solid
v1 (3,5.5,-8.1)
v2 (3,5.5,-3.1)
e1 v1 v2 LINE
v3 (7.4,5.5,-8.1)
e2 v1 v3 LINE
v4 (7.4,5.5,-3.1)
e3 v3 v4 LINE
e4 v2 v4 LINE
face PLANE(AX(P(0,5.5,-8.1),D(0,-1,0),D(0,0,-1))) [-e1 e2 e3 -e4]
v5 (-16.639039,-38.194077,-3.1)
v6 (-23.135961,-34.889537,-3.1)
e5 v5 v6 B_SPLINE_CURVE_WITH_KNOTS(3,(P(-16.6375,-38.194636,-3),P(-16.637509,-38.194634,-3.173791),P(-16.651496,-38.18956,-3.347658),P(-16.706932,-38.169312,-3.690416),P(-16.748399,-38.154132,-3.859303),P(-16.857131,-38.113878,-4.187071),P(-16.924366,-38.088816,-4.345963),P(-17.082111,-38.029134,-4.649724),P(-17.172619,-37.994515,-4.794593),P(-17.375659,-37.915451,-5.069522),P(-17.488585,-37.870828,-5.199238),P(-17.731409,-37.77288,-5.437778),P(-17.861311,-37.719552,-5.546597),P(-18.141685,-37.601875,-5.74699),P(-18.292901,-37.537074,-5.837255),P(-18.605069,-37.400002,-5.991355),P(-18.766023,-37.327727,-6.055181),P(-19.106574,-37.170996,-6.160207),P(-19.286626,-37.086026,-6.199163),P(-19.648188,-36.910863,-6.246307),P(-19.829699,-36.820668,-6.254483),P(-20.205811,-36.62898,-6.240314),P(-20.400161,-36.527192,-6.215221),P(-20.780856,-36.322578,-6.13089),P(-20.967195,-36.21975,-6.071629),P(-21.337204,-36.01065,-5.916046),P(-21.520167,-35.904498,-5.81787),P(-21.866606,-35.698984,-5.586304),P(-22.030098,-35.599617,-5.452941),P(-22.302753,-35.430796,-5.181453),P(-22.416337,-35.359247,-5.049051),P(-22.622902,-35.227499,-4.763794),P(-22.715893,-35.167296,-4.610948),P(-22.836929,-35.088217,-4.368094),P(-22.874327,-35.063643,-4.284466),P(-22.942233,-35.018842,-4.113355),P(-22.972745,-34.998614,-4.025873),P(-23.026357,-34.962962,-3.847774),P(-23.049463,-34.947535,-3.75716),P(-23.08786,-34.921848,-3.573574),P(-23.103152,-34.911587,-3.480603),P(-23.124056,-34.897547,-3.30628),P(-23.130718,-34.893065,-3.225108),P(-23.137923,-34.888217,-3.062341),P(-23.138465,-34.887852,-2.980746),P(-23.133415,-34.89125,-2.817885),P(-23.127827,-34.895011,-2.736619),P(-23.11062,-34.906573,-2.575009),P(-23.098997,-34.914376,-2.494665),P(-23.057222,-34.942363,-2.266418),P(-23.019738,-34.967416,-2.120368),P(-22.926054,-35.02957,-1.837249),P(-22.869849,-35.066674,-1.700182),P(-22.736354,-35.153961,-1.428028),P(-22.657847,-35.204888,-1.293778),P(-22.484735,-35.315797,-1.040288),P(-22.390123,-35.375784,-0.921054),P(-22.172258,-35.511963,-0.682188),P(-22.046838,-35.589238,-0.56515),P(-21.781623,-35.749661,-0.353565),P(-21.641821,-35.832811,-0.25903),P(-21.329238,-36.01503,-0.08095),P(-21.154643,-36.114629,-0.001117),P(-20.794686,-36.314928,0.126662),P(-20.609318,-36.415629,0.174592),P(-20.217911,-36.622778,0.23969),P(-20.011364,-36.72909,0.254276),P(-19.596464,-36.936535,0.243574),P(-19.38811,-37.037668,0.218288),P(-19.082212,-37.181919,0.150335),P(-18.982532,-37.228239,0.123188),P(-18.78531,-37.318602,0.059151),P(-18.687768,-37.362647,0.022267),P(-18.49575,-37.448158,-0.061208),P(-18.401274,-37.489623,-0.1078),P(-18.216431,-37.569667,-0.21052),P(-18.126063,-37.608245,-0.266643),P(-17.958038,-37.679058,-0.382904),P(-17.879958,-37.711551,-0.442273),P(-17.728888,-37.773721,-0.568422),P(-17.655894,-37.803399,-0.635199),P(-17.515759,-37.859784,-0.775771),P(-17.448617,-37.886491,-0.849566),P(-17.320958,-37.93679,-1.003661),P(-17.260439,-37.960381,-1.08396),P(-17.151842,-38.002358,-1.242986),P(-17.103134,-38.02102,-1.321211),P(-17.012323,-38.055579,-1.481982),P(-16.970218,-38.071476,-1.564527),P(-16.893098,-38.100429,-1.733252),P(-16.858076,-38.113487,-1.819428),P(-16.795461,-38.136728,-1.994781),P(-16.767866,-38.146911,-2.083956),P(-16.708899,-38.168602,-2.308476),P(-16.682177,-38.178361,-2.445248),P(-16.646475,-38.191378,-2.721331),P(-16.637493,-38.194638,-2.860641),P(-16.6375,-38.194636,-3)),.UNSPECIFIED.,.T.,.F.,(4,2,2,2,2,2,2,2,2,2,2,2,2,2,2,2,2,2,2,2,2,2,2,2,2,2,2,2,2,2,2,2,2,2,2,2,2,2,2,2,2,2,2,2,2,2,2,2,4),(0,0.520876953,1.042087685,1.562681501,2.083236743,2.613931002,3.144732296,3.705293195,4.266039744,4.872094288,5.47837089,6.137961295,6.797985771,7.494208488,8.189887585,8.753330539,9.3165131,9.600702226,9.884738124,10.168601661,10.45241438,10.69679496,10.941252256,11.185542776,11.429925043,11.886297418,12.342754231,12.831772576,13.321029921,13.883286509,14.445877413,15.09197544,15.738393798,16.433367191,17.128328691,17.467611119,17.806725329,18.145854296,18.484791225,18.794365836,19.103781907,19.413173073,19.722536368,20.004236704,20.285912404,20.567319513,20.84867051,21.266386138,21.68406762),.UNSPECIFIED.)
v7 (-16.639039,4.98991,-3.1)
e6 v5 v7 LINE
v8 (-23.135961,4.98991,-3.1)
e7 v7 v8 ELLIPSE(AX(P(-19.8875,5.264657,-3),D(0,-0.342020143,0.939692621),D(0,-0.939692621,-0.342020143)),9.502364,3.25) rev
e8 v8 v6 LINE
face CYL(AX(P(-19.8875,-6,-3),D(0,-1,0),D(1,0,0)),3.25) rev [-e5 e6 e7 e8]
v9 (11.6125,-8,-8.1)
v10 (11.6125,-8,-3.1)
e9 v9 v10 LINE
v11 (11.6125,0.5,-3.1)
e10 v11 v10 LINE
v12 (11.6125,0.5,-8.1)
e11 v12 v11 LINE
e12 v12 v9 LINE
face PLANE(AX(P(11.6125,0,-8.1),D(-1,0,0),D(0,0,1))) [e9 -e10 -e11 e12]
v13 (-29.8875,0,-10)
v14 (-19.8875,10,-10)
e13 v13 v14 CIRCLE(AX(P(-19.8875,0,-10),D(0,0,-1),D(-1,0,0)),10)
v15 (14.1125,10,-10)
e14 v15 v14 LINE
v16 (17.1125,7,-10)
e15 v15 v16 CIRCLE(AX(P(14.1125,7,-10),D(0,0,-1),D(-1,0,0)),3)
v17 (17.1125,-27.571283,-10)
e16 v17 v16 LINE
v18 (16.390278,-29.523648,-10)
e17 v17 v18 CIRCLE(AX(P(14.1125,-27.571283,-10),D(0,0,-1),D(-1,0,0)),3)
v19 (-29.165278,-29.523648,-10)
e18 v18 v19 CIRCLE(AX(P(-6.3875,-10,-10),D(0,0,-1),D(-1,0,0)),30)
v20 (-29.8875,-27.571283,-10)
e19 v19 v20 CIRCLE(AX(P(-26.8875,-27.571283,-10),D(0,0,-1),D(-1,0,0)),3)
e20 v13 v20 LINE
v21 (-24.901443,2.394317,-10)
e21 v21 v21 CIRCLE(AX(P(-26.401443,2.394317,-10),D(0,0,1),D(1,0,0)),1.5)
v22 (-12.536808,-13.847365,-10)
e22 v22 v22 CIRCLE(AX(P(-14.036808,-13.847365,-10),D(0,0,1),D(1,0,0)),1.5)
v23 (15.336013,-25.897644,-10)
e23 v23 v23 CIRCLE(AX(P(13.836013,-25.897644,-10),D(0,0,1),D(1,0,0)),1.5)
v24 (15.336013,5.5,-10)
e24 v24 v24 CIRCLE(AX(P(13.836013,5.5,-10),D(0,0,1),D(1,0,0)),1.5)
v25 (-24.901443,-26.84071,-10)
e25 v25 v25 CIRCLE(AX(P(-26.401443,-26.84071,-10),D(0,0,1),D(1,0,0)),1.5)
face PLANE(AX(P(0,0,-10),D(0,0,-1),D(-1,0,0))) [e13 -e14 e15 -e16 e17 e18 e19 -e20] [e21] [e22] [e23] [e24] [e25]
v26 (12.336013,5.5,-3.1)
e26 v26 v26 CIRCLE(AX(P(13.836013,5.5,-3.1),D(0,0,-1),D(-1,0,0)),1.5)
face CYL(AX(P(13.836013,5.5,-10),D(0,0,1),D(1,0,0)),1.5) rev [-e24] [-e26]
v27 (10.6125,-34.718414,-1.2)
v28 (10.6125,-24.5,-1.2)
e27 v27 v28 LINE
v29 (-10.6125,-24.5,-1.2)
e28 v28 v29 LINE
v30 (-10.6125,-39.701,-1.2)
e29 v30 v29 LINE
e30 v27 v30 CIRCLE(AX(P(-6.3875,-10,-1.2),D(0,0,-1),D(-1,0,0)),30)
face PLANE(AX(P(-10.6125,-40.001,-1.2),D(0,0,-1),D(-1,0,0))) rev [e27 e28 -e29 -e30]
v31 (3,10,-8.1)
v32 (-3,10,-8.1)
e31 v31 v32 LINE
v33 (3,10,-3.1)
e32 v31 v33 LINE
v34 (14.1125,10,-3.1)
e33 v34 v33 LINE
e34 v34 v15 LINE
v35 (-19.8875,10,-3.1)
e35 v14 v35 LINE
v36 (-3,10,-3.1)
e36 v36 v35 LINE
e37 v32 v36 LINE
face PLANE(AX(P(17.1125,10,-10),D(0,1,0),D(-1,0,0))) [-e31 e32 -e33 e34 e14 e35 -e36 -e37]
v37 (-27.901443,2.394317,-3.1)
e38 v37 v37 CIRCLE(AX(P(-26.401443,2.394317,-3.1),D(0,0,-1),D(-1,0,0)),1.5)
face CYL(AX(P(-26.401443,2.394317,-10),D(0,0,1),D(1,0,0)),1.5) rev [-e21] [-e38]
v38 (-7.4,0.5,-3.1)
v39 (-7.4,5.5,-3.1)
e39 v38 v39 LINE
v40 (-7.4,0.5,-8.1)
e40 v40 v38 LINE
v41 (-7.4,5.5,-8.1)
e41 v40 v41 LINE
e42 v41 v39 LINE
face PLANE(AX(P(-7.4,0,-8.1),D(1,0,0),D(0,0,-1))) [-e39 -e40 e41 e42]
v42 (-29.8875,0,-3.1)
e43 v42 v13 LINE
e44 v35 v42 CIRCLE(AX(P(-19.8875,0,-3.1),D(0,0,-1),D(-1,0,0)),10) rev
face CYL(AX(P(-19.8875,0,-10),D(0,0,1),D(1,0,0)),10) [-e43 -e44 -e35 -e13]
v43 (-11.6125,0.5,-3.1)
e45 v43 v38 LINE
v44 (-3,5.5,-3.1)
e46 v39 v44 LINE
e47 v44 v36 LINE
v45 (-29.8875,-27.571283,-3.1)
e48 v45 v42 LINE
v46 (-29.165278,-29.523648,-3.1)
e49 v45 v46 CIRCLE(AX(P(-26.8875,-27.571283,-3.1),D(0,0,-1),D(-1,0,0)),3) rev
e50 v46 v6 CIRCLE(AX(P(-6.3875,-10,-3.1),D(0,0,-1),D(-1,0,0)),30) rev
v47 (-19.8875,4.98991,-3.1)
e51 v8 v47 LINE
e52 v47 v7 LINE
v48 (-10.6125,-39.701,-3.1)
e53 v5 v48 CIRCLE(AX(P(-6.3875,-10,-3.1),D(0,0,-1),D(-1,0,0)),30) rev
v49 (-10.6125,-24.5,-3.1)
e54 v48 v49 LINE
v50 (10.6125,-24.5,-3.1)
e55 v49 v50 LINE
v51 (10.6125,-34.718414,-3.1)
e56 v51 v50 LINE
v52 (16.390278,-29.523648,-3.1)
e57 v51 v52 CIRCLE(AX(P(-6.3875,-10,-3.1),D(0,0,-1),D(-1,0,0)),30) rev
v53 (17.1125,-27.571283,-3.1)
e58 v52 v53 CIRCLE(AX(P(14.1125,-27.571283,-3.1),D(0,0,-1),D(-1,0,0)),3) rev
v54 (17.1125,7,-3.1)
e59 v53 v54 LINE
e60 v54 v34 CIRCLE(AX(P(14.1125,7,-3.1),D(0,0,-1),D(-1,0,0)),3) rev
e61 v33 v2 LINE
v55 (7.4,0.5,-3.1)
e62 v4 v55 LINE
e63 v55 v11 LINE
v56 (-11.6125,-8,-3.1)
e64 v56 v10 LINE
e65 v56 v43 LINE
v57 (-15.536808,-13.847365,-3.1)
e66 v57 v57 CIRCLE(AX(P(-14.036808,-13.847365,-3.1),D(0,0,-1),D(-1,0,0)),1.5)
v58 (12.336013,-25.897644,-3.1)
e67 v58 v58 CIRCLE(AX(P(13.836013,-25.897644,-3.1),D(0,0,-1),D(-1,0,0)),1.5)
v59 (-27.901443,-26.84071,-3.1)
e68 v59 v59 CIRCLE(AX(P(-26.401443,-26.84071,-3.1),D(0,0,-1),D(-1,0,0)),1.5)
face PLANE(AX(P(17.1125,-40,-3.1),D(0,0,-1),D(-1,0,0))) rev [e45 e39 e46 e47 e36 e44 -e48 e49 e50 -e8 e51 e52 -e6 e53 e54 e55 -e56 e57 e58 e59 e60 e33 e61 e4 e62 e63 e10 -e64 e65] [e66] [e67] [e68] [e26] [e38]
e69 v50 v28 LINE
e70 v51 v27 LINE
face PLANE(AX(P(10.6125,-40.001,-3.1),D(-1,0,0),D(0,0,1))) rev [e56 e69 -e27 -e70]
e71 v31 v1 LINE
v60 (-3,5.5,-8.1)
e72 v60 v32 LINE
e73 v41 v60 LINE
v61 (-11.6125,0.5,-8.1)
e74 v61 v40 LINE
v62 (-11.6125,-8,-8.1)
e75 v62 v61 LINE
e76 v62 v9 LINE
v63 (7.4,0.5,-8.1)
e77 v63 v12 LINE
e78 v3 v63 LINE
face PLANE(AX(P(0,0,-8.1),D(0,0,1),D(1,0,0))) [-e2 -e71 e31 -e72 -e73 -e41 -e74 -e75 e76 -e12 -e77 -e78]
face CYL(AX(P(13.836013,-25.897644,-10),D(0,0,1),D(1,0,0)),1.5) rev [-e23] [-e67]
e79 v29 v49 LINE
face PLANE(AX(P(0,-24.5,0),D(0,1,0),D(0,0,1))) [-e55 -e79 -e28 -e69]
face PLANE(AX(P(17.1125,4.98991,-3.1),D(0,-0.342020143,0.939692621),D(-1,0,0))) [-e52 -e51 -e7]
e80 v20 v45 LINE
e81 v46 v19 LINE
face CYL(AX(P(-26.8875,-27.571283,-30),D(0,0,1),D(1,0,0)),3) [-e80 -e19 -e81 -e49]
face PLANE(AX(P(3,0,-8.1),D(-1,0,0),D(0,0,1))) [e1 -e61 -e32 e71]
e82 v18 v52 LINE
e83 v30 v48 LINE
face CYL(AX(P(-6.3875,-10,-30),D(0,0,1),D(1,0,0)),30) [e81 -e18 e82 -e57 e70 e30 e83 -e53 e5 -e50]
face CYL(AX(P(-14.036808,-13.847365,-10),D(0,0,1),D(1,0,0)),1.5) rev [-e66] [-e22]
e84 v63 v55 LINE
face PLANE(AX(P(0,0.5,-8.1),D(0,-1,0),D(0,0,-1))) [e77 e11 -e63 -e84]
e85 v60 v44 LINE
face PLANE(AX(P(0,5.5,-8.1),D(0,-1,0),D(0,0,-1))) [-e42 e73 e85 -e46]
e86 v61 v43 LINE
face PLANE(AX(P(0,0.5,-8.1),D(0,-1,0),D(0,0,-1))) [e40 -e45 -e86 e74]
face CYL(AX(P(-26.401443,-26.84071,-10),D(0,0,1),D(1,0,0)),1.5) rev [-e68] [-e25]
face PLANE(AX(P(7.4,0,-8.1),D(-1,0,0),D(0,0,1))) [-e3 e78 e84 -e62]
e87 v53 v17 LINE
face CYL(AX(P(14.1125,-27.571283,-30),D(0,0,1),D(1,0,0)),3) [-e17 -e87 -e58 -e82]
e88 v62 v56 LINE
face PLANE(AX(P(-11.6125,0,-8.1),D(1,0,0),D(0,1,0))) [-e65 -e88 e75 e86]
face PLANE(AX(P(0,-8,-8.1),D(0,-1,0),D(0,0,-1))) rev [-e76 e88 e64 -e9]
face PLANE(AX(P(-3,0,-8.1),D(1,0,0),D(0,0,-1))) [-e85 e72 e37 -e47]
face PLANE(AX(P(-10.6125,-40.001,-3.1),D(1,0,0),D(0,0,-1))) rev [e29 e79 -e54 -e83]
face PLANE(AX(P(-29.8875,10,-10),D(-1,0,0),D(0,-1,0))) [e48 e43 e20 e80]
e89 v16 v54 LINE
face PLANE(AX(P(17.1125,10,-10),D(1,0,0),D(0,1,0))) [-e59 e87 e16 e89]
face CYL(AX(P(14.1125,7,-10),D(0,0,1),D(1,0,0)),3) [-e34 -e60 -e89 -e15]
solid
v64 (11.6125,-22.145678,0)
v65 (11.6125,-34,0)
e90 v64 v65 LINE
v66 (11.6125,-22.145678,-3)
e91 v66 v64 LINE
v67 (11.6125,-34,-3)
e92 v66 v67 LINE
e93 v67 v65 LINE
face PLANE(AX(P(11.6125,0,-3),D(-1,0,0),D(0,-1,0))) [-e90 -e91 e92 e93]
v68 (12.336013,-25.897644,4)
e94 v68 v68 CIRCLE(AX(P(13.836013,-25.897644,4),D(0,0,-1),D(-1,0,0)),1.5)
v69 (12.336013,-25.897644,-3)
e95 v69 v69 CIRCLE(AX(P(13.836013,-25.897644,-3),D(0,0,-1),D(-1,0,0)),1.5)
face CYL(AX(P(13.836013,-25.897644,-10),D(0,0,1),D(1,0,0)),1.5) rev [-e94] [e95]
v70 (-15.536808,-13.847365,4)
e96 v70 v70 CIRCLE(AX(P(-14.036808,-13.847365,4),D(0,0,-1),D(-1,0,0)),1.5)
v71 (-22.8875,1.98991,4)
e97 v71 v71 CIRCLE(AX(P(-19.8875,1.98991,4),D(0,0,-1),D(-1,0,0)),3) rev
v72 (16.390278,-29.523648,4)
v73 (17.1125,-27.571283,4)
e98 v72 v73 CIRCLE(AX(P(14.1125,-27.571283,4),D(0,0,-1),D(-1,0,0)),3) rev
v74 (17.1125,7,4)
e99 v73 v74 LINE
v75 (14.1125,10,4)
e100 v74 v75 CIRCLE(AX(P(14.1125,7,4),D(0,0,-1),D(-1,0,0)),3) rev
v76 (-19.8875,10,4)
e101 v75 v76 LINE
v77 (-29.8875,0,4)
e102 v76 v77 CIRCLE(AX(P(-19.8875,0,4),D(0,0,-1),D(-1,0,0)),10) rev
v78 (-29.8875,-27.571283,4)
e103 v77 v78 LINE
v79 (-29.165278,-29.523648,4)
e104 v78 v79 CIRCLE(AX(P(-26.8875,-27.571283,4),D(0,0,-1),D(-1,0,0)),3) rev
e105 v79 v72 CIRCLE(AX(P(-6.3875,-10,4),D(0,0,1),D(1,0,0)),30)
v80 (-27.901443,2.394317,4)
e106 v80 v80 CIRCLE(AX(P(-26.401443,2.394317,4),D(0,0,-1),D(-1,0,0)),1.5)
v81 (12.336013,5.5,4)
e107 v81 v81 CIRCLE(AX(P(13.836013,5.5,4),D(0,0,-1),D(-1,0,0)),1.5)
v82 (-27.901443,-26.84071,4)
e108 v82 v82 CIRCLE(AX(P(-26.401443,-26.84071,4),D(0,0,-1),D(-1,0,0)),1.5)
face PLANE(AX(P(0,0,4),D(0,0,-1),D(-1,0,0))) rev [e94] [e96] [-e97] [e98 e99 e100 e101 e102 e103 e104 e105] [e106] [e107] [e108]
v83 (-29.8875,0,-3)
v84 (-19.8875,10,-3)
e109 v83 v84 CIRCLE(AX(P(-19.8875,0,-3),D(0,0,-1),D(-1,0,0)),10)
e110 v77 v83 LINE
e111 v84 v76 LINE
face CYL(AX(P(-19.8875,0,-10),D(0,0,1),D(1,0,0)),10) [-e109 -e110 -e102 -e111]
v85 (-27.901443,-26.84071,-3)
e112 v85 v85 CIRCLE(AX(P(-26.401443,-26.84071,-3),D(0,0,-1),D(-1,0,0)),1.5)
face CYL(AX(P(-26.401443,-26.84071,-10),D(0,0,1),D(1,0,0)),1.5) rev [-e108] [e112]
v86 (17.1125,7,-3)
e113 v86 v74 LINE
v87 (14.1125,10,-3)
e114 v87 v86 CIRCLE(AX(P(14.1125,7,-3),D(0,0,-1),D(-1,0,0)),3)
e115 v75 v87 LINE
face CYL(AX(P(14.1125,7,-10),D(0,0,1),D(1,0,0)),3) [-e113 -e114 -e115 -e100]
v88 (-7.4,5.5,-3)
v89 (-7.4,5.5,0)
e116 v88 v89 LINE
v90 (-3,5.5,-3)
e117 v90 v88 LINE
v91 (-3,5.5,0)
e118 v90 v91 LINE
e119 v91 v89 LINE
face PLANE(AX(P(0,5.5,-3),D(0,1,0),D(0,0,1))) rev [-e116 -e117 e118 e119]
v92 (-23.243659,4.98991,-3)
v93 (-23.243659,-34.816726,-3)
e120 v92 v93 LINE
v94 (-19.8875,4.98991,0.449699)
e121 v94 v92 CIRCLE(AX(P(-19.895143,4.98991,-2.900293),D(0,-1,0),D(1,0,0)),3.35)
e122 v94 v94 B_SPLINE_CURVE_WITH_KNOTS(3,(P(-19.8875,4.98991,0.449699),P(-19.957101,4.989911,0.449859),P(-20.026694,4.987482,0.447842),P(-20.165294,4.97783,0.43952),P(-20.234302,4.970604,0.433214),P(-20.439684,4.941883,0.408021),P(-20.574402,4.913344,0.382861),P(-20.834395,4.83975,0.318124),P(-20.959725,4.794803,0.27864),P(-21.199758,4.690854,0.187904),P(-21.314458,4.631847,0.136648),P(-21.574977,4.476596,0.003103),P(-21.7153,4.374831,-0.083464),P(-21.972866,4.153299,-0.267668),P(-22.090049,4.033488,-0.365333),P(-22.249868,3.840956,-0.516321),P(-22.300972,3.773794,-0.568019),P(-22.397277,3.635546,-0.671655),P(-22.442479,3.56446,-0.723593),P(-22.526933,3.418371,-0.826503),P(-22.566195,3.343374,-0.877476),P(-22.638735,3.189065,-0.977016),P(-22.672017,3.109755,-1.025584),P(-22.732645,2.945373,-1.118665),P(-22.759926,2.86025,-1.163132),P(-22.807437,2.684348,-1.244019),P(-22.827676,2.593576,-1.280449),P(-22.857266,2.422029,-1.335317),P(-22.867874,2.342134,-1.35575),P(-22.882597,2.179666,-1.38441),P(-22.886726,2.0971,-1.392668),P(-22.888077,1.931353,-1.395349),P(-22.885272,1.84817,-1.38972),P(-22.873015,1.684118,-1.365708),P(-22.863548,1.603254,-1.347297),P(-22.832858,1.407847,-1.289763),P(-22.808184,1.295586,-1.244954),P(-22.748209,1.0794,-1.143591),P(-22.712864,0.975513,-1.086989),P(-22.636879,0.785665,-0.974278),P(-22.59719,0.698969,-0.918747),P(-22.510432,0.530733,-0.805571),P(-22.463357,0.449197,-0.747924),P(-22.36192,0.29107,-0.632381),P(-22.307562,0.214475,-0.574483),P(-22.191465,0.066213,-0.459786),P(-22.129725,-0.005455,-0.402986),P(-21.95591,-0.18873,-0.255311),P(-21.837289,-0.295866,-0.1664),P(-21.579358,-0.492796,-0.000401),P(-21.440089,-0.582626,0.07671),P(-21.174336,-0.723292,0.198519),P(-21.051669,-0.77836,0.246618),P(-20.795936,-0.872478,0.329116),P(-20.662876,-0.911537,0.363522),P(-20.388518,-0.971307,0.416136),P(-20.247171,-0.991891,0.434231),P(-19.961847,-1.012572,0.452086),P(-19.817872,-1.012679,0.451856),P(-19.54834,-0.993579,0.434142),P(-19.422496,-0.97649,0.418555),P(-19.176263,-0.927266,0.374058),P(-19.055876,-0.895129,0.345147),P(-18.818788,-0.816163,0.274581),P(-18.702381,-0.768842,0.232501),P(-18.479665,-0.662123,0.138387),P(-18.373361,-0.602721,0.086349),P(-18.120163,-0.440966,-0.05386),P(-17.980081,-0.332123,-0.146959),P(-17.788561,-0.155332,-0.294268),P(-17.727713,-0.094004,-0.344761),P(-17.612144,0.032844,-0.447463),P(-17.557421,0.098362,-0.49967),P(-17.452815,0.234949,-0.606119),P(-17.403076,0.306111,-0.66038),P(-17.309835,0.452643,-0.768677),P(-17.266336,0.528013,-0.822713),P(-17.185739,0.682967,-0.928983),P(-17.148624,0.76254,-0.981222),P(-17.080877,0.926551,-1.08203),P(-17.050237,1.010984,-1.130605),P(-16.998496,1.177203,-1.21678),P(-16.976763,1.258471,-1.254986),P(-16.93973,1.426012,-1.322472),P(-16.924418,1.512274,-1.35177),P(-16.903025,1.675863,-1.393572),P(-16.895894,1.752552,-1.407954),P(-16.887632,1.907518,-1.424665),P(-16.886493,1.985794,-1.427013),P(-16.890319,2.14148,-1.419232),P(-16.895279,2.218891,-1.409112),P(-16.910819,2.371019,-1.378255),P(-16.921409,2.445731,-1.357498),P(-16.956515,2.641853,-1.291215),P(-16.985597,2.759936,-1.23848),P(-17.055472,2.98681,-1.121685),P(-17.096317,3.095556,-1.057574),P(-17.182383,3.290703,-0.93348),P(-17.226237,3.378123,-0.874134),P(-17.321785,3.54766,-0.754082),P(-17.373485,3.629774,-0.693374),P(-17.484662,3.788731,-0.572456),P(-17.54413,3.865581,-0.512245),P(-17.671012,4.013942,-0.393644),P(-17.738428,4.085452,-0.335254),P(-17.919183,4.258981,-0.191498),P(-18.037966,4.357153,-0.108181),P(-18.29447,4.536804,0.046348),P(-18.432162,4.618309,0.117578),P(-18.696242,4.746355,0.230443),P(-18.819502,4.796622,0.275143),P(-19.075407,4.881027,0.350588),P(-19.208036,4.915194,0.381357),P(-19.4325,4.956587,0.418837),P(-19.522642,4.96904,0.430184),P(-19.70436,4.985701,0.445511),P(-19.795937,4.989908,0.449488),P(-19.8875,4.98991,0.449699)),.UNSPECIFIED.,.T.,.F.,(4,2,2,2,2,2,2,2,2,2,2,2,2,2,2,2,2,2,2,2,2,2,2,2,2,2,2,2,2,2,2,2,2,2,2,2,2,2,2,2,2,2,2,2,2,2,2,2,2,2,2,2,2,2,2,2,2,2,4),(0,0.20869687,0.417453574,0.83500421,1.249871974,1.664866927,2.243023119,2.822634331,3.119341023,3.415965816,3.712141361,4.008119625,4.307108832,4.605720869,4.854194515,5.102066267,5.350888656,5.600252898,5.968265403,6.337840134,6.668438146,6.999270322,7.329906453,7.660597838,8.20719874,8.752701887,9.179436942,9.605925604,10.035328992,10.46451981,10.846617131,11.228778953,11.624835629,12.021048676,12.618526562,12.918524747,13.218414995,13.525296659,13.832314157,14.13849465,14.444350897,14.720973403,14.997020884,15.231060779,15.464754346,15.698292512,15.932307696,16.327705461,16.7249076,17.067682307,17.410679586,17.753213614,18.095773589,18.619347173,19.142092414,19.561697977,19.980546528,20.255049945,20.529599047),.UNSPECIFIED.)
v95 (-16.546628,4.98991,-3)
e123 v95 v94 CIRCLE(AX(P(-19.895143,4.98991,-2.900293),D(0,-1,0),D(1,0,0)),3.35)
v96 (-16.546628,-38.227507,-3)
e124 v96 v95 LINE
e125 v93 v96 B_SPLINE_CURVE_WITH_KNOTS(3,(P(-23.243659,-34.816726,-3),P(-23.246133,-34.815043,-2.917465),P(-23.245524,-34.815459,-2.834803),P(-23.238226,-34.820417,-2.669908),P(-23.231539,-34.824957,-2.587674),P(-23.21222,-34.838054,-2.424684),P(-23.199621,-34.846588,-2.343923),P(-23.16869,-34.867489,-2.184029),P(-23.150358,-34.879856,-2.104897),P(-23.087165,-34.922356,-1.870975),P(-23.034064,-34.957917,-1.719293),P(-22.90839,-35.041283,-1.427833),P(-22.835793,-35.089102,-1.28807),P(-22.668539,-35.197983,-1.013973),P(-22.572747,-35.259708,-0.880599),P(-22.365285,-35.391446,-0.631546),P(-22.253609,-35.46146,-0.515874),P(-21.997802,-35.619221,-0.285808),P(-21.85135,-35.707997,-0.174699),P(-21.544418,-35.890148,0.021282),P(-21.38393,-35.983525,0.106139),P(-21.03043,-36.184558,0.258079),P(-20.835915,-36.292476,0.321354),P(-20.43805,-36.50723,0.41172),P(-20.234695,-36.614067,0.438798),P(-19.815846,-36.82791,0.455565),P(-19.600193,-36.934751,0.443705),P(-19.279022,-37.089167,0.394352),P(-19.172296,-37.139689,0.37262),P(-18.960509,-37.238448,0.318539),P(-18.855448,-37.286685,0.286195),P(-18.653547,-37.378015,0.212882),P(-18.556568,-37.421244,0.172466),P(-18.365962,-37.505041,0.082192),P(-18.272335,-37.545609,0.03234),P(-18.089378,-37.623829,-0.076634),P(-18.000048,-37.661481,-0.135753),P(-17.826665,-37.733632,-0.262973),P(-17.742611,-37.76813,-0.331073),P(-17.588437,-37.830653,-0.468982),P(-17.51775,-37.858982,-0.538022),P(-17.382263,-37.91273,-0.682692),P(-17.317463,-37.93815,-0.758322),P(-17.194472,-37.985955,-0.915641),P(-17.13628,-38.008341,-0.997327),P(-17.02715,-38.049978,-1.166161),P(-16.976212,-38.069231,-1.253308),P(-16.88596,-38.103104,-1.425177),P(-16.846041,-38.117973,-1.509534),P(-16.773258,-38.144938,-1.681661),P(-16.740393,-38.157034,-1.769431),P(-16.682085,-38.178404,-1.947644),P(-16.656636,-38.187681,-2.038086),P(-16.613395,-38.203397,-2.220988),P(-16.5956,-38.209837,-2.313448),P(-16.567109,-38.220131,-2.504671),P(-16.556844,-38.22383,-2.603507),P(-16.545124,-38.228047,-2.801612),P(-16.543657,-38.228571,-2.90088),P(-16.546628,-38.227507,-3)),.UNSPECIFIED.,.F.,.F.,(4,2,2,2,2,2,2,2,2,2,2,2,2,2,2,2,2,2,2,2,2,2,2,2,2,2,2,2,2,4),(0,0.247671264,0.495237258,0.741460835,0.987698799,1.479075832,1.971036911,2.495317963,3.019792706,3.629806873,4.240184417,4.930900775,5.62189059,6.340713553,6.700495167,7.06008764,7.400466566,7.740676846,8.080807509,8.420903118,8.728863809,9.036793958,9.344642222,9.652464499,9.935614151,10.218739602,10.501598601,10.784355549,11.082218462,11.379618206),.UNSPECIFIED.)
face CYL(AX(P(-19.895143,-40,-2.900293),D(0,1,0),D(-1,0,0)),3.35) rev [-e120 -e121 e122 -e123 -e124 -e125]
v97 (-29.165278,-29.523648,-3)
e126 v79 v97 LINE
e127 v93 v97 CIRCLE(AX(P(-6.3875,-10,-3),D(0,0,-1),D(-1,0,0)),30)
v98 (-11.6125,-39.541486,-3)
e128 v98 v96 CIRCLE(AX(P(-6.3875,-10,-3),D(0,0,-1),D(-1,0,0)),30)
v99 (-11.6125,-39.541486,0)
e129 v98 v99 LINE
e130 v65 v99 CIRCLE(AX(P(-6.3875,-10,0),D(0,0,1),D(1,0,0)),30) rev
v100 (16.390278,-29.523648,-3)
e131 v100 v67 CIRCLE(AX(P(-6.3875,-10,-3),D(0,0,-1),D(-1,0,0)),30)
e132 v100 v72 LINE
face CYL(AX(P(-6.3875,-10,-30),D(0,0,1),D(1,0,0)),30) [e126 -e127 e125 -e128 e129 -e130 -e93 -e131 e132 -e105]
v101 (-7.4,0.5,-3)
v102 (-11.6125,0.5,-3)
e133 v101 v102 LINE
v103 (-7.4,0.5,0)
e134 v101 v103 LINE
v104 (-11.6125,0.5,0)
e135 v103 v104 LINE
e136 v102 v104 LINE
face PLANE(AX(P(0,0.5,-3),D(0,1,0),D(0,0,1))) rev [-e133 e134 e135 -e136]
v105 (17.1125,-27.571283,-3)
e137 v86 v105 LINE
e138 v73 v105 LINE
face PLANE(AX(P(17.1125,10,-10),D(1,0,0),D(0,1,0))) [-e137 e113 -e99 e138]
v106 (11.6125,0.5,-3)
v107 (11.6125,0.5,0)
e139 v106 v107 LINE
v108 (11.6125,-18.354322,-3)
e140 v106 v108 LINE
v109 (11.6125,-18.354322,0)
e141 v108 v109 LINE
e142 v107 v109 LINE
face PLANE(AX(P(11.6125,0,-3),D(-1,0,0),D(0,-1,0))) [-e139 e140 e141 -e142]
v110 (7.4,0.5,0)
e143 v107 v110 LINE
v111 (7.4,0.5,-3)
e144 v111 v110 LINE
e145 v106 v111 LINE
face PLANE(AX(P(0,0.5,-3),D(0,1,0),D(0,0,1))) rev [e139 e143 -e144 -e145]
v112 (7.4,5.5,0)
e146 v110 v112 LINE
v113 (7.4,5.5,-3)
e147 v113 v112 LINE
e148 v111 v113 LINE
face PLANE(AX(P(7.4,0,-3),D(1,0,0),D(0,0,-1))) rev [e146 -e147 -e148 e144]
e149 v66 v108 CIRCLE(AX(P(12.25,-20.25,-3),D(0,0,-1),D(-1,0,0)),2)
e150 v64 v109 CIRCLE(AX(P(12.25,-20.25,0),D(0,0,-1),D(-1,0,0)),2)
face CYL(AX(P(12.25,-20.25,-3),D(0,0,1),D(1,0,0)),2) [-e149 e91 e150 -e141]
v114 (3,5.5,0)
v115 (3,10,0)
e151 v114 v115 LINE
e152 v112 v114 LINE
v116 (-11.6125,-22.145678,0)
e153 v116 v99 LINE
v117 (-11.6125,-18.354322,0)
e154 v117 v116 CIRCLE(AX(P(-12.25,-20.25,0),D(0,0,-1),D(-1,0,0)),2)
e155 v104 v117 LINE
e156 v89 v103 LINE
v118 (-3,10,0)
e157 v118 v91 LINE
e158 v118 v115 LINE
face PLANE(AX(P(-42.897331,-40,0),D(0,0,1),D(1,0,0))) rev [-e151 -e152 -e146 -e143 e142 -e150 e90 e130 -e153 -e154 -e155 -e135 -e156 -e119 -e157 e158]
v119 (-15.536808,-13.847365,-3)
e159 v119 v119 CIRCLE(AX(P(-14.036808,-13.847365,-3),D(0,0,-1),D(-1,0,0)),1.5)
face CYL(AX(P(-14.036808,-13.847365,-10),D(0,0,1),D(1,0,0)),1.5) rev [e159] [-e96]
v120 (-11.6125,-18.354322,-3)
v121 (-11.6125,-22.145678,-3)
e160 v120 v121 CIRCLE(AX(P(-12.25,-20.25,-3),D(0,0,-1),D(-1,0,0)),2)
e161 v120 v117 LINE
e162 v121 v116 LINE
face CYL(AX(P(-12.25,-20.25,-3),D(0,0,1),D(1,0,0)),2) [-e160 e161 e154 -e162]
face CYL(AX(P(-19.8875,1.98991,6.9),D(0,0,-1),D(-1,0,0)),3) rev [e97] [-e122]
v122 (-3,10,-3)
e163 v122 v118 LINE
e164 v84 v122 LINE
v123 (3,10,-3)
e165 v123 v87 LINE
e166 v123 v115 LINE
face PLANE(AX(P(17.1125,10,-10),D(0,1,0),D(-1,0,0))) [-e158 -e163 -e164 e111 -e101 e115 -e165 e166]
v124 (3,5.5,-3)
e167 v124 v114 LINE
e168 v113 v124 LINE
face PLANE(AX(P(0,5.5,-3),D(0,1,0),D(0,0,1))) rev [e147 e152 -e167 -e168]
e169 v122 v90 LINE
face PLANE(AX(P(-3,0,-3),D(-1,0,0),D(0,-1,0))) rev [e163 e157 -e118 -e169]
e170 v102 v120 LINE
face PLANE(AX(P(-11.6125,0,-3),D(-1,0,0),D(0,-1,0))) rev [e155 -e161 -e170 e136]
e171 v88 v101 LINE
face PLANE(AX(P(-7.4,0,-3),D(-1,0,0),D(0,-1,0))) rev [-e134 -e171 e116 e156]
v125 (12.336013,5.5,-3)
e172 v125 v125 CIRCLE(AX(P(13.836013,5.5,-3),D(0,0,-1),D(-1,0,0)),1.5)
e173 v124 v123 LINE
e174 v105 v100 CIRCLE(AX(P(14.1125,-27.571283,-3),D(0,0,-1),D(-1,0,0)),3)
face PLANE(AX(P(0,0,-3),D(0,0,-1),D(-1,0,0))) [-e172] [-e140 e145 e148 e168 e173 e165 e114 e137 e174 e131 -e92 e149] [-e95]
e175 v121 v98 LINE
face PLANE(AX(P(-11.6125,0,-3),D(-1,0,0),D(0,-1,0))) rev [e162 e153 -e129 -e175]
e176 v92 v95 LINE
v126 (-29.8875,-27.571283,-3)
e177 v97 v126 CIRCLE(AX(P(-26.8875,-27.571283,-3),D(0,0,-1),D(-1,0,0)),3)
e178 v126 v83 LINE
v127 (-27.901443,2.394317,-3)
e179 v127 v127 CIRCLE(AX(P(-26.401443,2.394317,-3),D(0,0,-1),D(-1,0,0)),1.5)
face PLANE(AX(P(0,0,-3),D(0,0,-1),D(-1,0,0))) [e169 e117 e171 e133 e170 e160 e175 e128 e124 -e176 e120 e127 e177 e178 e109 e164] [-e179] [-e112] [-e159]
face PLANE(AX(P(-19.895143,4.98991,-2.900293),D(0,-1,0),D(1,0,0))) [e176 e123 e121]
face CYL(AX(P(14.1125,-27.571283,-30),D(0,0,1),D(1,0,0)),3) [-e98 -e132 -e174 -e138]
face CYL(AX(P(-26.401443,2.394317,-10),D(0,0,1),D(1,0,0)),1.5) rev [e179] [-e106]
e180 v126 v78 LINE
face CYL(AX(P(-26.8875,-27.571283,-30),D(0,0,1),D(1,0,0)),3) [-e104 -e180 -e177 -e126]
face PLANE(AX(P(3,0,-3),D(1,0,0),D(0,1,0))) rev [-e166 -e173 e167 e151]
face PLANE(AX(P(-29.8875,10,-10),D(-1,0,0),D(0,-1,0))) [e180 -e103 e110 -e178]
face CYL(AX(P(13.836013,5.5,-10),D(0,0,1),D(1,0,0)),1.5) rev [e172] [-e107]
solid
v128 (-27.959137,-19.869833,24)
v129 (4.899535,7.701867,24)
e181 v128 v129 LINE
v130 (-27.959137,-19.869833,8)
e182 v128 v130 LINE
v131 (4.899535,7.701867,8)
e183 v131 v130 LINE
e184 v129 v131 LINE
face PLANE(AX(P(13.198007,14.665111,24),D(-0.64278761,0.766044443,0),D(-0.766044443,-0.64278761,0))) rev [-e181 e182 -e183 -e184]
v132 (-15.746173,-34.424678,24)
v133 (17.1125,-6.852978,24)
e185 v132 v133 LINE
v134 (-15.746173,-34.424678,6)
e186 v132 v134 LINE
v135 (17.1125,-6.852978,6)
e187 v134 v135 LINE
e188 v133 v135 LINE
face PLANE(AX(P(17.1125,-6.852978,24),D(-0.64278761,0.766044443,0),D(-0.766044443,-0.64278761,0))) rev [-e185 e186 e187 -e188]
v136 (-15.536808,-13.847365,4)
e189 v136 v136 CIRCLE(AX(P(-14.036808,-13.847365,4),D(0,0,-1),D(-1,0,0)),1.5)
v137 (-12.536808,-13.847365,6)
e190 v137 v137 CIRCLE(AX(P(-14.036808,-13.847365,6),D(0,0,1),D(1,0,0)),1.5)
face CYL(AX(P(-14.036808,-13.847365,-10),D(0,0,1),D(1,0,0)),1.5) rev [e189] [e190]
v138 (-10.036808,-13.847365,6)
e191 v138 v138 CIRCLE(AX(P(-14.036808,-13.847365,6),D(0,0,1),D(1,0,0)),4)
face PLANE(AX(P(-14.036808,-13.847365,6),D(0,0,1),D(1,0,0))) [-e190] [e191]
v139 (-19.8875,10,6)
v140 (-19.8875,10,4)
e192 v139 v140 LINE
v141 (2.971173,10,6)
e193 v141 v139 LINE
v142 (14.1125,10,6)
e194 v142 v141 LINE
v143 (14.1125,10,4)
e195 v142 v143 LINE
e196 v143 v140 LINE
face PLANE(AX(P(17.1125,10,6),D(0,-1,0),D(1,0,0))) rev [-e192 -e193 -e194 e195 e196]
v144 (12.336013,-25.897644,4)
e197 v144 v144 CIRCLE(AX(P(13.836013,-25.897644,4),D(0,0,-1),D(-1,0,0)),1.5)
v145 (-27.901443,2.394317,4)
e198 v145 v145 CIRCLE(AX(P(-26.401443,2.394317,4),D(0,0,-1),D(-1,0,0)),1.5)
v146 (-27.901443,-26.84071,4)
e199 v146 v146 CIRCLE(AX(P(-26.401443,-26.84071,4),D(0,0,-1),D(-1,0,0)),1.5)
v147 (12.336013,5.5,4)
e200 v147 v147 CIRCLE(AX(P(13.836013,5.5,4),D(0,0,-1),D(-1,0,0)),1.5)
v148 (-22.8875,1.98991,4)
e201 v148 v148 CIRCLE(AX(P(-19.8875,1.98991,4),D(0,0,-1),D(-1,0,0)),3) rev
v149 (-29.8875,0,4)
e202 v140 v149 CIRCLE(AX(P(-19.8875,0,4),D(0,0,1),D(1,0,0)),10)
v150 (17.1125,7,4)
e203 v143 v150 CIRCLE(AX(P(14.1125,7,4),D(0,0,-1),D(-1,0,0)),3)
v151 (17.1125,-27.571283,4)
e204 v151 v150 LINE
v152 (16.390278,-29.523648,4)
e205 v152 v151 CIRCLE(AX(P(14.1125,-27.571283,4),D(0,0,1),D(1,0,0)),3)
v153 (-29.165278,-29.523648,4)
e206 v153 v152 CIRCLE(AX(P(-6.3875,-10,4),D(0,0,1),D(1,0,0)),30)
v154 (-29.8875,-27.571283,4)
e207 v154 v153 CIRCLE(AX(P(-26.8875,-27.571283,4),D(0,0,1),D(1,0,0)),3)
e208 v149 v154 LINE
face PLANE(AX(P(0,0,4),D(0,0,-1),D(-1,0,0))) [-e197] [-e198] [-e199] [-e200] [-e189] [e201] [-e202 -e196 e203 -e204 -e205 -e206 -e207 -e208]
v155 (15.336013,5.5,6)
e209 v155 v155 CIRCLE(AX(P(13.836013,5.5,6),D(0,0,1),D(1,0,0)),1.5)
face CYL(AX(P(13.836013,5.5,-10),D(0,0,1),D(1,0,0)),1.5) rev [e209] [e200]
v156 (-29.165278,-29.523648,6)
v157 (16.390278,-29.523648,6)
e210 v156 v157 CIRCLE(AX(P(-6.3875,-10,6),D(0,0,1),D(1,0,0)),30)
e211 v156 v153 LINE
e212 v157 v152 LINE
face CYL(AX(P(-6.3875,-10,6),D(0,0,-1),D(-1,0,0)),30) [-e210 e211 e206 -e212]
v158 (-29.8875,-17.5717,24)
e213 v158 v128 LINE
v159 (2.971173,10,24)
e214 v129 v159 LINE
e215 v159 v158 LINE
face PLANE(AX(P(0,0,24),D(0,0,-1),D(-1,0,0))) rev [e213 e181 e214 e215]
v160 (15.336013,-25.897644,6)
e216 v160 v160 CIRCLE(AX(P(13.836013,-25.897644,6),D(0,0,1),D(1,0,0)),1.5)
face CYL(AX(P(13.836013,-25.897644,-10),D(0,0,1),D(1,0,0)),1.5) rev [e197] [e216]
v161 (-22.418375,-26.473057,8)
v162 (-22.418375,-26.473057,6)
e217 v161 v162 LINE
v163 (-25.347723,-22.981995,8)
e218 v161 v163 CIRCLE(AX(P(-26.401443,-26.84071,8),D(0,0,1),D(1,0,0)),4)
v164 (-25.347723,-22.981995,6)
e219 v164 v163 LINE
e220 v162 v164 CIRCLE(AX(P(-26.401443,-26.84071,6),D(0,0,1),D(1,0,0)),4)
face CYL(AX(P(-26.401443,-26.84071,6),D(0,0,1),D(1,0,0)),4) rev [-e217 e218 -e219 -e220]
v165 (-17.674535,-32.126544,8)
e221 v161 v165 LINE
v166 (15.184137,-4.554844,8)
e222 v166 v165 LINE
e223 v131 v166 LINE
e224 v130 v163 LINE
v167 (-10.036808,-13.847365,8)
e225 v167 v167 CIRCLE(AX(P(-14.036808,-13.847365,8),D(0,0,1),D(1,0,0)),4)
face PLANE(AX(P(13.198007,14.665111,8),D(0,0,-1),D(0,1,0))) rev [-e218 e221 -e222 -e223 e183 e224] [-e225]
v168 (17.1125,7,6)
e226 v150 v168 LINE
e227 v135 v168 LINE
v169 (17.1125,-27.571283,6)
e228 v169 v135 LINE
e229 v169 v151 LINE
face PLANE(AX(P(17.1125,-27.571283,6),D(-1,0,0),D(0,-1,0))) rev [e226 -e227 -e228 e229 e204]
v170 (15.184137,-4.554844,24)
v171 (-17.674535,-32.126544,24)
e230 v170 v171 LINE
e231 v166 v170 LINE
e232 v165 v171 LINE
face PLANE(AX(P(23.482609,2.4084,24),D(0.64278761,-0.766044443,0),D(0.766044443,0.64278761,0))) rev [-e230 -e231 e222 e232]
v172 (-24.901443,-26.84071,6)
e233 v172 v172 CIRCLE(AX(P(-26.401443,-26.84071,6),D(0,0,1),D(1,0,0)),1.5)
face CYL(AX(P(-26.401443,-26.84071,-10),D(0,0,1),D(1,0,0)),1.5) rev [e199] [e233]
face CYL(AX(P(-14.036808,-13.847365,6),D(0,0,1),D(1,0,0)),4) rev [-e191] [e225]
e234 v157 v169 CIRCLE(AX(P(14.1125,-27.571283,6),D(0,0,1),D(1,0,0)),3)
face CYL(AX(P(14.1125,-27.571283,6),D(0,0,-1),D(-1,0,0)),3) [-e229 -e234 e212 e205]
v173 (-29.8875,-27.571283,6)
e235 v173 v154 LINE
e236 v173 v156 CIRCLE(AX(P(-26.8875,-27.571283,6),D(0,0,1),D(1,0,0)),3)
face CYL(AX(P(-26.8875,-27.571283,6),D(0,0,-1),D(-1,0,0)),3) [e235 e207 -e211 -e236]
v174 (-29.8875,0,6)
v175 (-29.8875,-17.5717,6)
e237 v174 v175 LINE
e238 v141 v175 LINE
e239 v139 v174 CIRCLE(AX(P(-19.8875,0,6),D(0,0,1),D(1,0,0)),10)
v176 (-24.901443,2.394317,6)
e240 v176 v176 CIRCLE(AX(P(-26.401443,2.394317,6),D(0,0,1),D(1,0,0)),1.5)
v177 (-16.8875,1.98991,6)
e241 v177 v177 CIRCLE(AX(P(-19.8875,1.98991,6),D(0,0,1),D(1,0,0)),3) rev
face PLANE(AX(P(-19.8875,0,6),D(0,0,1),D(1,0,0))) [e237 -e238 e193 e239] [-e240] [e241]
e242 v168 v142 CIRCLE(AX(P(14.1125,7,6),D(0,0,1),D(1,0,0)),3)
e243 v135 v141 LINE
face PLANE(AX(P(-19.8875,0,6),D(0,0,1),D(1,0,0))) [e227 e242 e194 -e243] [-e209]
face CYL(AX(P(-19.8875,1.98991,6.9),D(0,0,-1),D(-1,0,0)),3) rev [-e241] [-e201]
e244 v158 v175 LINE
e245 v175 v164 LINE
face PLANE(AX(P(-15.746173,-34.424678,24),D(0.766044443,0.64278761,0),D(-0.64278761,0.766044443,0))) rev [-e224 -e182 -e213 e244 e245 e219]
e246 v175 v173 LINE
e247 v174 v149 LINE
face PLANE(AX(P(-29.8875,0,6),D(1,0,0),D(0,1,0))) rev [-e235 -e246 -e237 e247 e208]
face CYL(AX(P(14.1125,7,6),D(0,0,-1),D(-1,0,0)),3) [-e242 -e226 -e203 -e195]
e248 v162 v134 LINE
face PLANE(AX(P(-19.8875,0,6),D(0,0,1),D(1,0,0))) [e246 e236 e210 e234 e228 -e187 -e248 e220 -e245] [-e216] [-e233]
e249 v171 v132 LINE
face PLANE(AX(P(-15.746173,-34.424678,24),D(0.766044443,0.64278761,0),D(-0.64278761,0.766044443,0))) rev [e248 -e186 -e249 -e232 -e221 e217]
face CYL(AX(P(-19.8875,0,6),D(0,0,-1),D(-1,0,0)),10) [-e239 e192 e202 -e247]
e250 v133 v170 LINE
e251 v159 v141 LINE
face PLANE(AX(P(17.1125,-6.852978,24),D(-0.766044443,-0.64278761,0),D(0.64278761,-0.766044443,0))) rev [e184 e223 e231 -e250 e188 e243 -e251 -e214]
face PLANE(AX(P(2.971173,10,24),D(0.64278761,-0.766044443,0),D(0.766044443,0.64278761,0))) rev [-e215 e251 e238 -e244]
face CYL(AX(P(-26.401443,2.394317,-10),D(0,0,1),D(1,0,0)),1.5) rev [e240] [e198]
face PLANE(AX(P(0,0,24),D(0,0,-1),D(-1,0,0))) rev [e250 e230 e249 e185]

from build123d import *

# Parameters (mm, degrees)
BOSS_EXTRUDE1_DEPTH      = 4
BOSS_EXTRUDE1_DEPTH_BACK = 10
SKETCH1_W                = 47
SKETCH1_H                = 50
SKETCH2_R                = 3.25
CUT_EXTRUDE1_DEPTH       = 34
CUT_EXTRUDE2_DEPTH       = 34
FILLET6_R                = 3
CUT_EXTRUDE3_DEPTH       = 51.924087289
CUT_EXTRUDE3_DEPTH_BACK  = 51.924087289
SKETCH5_W                = 79.114310325
SKETCH5_H                = 0.1
BOSS_EXTRUDE2_DEPTH      = 3
SKETCH7_R                = 3.35
CUT_EXTRUDE4_DEPTH       = 47.360140908
CUT_EXTRUDE5_DEPTH       = 60.103829557
CUT_EXTRUDE5_DEPTH_BACK  = 60.103829557
SKETCH8_W                = 47
SKETCH8_H                = 3
CHAMFER1_SIZE            = 10.989909678
CHAMFER1_SIZE_2          = 4
CUT_EXTRUDE6_START       = -10.98991
CUT_EXTRUDE6_DEPTH       = 10.98991
BOSS_EXTRUDE3_REACH      = 78.318
BOSS_EXTRUDE3_END_RADIUS = 30
BOSS_EXTRUDE3_START      = 25
SKETCH11_W               = 21.225
SKETCH11_H               = 1.9
CUT_EXTRUDE8_DEPTH       = 5
BOSS_EXTRUDE4_DEPTH      = 20
FILLET1_R                = 10
BOSS_EXTRUDE5_DEPTH      = 2
SKETCH16_W               = 16
SKETCH16_H               = 16
CUT_EXTRUDE9_DEPTH       = 59.938302942
SKETCH17_R               = 1.5
CUT_EXTRUDE10_DEPTH      = 54.077892425
SKETCH10_R               = 3
CUT_EXTRUDE7_DEPTH       = 10
FILLET2_R                = 10
FILLET3_R                = 3
FILLET4_R                = 3
FILLET5_R                = 3
SKETCH18_R               = 4
CUT_EXTRUDE11_DEPTH      = 2


with BuildPart() as part:
    # Sketch1 → Boss-Extrude1 (new, two sides: drawn at the far end of the back side and taken through both)
    with BuildSketch(Plane.XY.offset(-BOSS_EXTRUDE1_DEPTH_BACK)):
        with Locations((-6.3875, -15)):
            Rectangle(SKETCH1_W, SKETCH1_H)
    extrude(amount=BOSS_EXTRUDE1_DEPTH + BOSS_EXTRUDE1_DEPTH_BACK)

    # Sketch2 → Cut-Extrude1 (cut)
    with BuildSketch(Plane.XZ.offset(40)):
        with Locations((-19.8875, -3)):
            Circle(SKETCH2_R)
    extrude(amount=-CUT_EXTRUDE1_DEPTH, mode=Mode.SUBTRACT)

    # Sketch3 → Cut-Extrude2 (cut)
    with BuildSketch(Plane.XY.offset(4)):
        with BuildLine():
            ThreePointArc((-6.3875, -40), (-19.436605602, -37.013345646), (-29.8875, -28.648056199))
            Line((-29.8875, -28.648056199), (-29.8875, -40))
            Line((-29.8875, -40), (-6.3875, -40))
        make_face()
        with BuildLine():
            ThreePointArc((17.1125, -28.648056199), (6.661605602, -37.013345646), (-6.3875, -40))
            Line((-6.3875, -40), (17.1125, -40))
            Line((17.1125, -40), (17.1125, -28.648056199))
        make_face()
    extrude(amount=-CUT_EXTRUDE2_DEPTH, mode=Mode.SUBTRACT)

    # Fillet6
    fillet6_edges = [part.edges().sort_by_distance(p)[0] for p in [
        (-29.8875, -28.648056199, -3),
        (17.1125, -28.648056199, -3),
    ]]
    fillet(fillet6_edges, radius=FILLET6_R)

    # Sketch5 → Cut-Extrude3 (cut, two sides: drawn at the far end of the back side and taken through both)
    with BuildSketch(Plane(origin=(0, 0, 0), x_dir=(1, 0, 0), z_dir=(0, 1, 0)).offset(-CUT_EXTRUDE3_DEPTH_BACK)):
        with Locations((-3.340175776, 0.05)):
            Rectangle(SKETCH5_W, SKETCH5_H)
    extrude(amount=CUT_EXTRUDE3_DEPTH + CUT_EXTRUDE3_DEPTH_BACK, mode=Mode.SUBTRACT)


with BuildPart() as cut_extrude3_piece_1:
    # of the separate pieces the step leaves, piece 1, a body of its own (cut_extrude3_pieces)
    add(part.part.solids().sort_by_distance((17.1125, -27.571283391, -10))[0])

    # Sketch8 → Cut-Extrude5 (cut, two sides: drawn at the far end of the back side and taken through both)
    with BuildSketch(Plane(origin=(0, 10, 0), x_dir=(1, 0, 0), z_dir=(0, 1, 0)).offset(-CUT_EXTRUDE5_DEPTH_BACK)):
        with Locations((-6.3875, 1.6)):
            Rectangle(SKETCH8_W, SKETCH8_H)
    extrude(amount=CUT_EXTRUDE5_DEPTH + CUT_EXTRUDE5_DEPTH_BACK, mode=Mode.SUBTRACT)

    # Chamfer1
    # the kernel refuses this chamfer: 10.989909678, 4 mm, written as the material it takes off along each edge
    with BuildSketch(Plane(origin=(11.870926972, -6, -3.1), x_dir=(0, 0.9999130865277316, 0.013184058198645774), z_dir=(-1, 0, 0))) as chamfer1_piece_1_section:
        Polygon((CHAMFER1_SIZE * 0.999913086511, CHAMFER1_SIZE * 0.0131840581984), (-CHAMFER1_SIZE_2 * 0.0131840581986, CHAMFER1_SIZE_2 * 0.999913086528), (0, 0), align=None)
    chamfer1_piece_1 = extrude(amount=63.516853943, mode=Mode.PRIVATE)
    chamfer1_piece_1 = chamfer1_piece_1 & Plane(origin=(-19.8875, -1.979890476, -3), x_dir=(1, 0, 0), z_dir=(0, -1, 0)) * Cylinder(3.25, 171, mode=Mode.PRIVATE)
    add(chamfer1_piece_1, mode=Mode.SUBTRACT)

    # Boss-Extrude3: up to this cylinder (the profile starts inside it)
    boss_extrude3_end = Plane(origin=(-6.3875, -10, -2.15), z_dir=(0, 0, 1)) * Cylinder(BOSS_EXTRUDE3_END_RADIUS, 217.636, mode=Mode.PRIVATE)
    # Sketch11 → Boss-Extrude3 (add, up to the surface)
    with BuildSketch(Plane.XZ.offset(-0.5).offset(BOSS_EXTRUDE3_START), mode=Mode.PRIVATE) as boss_extrude3_sk1:
        with Locations((0, -2.15)):
            Rectangle(SKETCH11_W, SKETCH11_H)
    boss_extrude3_tool1 = extrude(boss_extrude3_sk1.sketch, amount=BOSS_EXTRUDE3_REACH, mode=Mode.PRIVATE) & boss_extrude3_end
    add(boss_extrude3_tool1.solids().sort_by_distance((0, -24.5, -2.15))[0])

    # Sketch12 → Cut-Extrude8 (cut)
    with BuildSketch(Plane.XY.offset(-3.1)):
        Polygon((-11.6125, 0.5), (-11.6125, -8), (11.6125, -8), (11.6125, 0.5), (7.4, 0.5), (7.4, 5.5), (3, 5.5), (3, 10), (-3, 10), (-3, 5.5), (-7.4, 5.5), (-7.4, 0.5), align=None)
    extrude(amount=-CUT_EXTRUDE8_DEPTH, mode=Mode.SUBTRACT)


with BuildPart() as cut_extrude3_piece_2:
    # of the separate pieces the step leaves, piece 2, a body of its own (cut_extrude3_pieces)
    add(part.part.solids().sort_by_distance((17.1125, 10, 0))[0])

    # Sketch6 → Boss-Extrude2 (add)
    with BuildSketch(Plane(origin=(0, 0, 0), x_dir=(-1, 0, 0), z_dir=(0, 0, -1))):
        with BuildLine():
            Line((-3, 10), (-17.1125, 10))
            Line((-17.1125, 10), (-17.1125, -27.571283391))
            ThreePointArc((-17.1125, -27.571283391), (-16.926157169, -28.612116391), (-16.390277778, -29.523648212))
            ThreePointArc((-16.390277778, -29.523648212), (-14.123868103, -31.892550755), (-11.6125, -34))
            Line((-11.6125, -34), (-11.6125, -22.145677649))
            ThreePointArc((-11.6125, -22.145677649), (-10.25, -20.25), (-11.6125, -18.354322351))
            Line((-11.6125, -18.354322351), (-11.6125, 0.5))
            Line((-11.6125, 0.5), (-7.4, 0.5))
            Line((-7.4, 0.5), (-7.4, 5.5))
            Line((-7.4, 5.5), (-3, 5.5))
            Line((-3, 5.5), (-3, 10))
        make_face()
        with BuildLine():
            Line((3, 10), (3, 5.5))
            Line((3, 5.5), (7.4, 5.5))
            Line((7.4, 5.5), (7.4, 0.5))
            Line((7.4, 0.5), (11.6125, 0.5))
            Line((11.6125, 0.5), (11.6125, -18.354322351))
            ThreePointArc((11.6125, -18.354322351), (10.25, -20.25), (11.6125, -22.145677649))
            Line((11.6125, -22.145677649), (11.6125, -39.54148566))
            ThreePointArc((11.6125, -39.54148566), (15.191279196, -38.679146987), (18.6375, -37.384986763))
            Line((18.6375, -37.384986763), (18.6375, -6))
            Line((18.6375, -6), (21.1375, -6))
            Line((21.1375, -6), (21.1375, -36.123504742))
            ThreePointArc((21.1375, -36.123504742), (25.439351689, -33.173841874), (29.165277778, -29.523648212))
            ThreePointArc((29.165277778, -29.523648212), (29.701157169, -28.612116391), (29.8875, -27.571283391))
            Line((29.8875, -27.571283391), (29.8875, 10))
            Line((29.8875, 10), (3, 10))
        make_face()
    extrude(amount=BOSS_EXTRUDE2_DEPTH)

    # Sketch7 → Cut-Extrude4 (cut, through all)
    with BuildSketch(Plane.XZ.offset(6)):
        with Locations((-19.895143437, -2.900292539)):
            Circle(SKETCH7_R)
    extrude(amount=CUT_EXTRUDE4_DEPTH, mode=Mode.SUBTRACT)

    # Sketch9 → Cut-Extrude6 (cut)
    with BuildSketch(Plane.XZ.offset(6).offset(CUT_EXTRUDE6_START)):
        with BuildLine():
            Line((-23.243659291, -3), (-16.546627584, -3))
            ThreePointArc((-16.546627584, -3), (-19.895143437, 0.449707461), (-23.243659291, -3))
        make_face()
    extrude(amount=CUT_EXTRUDE6_DEPTH, mode=Mode.SUBTRACT)

    # Fillet1
    fillet1_edges = [cut_extrude3_piece_2.edges().sort_by_distance(p)[0] for p in [
        (-29.8875, 10, 0.5),
    ]]
    fillet(fillet1_edges, radius=FILLET1_R)


with BuildPart() as body_3:
    # Sketch13 → Boss-Extrude4 (new body)
    with BuildSketch(Plane.XY.offset(4)):
        Polygon((17.1125, -6.852977749), (2.971172587, 10), (-29.8875, -17.571700049), (-15.746172587, -34.424677797), align=None)
    extrude(amount=BOSS_EXTRUDE4_DEPTH)

    # Sketch15 → Boss-Extrude5 (add)
    with BuildSketch(Plane.XY.offset(4)):
        with BuildLine():
            Line((17.1125, 10), (-19.8875, 10))
            ThreePointArc((-19.8875, 10), (-26.958567812, 7.071067812), (-29.8875, 0))
            Line((-29.8875, 0), (-29.8875, -27.571283391))
            ThreePointArc((-29.8875, -27.571283391), (-29.701157169, -28.612116391), (-29.165277778, -29.523648212))
            ThreePointArc((-29.165277778, -29.523648212), (-6.3875, -40), (16.390277778, -29.523648212))
            ThreePointArc((16.390277778, -29.523648212), (16.926157169, -28.612116391), (17.1125, -27.571283391))
            Line((17.1125, -27.571283391), (17.1125, 10))
        make_face()
    extrude(amount=BOSS_EXTRUDE5_DEPTH)

    # Sketch16 → Cut-Extrude9 (cut, through all)
    with BuildSketch(Plane(origin=(-26.191078176, -21.976924037, 0), x_dir=(0, 0, 1), z_dir=(-0.7660444431189749, -0.642787609686543, 0))):
        with Locations((16, -5.249388494)):
            Rectangle(SKETCH16_W, SKETCH16_H)
    extrude(amount=-CUT_EXTRUDE9_DEPTH, mode=Mode.SUBTRACT)


with BuildPart() as cut_extrude10_tool:
    # Sketch17 → Cut-Extrude10 (new, through all)
    with BuildSketch(Plane.XY.offset(6)):
        with Locations((13.836012781, -25.897644193)):
            Circle(SKETCH17_R)
        with Locations((-14.036807943, -13.847364557)):
            Circle(SKETCH17_R)
        with Locations((-26.401442701, 2.394316693)):
            Circle(SKETCH17_R)
        with Locations((13.836012781, 5.5)):
            Circle(SKETCH17_R)
        with Locations((-26.401442701, -26.840709556)):
            Circle(SKETCH17_R)
    extrude(amount=-CUT_EXTRUDE10_DEPTH)


with BuildPart() as cut_extrude3_piece_1_1:
    add(cut_extrude3_piece_1.part)

    # Cut-Extrude10: cut by cut_extrude10_tool
    add(cut_extrude10_tool.part, mode=Mode.SUBTRACT)

    # Fillet2
    fillet2_edges = [cut_extrude3_piece_1_1.edges().sort_by_distance(p)[0] for p in [
        (-29.8875, 10, -6.55),
    ]]
    fillet(fillet2_edges, radius=FILLET2_R)

    # Fillet3
    fillet3_edges = [cut_extrude3_piece_1_1.edges().sort_by_distance(p)[0] for p in [
        (17.1125, 10, -6.55),
    ]]
    fillet(fillet3_edges, radius=FILLET3_R)


with BuildPart() as cut_extrude3_piece_2_1:
    add(cut_extrude3_piece_2.part)

    # Cut-Extrude10: cut by cut_extrude10_tool
    add(cut_extrude10_tool.part, mode=Mode.SUBTRACT)


with BuildPart() as body_3_1:
    add(body_3.part)

    # Cut-Extrude10: cut by cut_extrude10_tool
    add(cut_extrude10_tool.part, mode=Mode.SUBTRACT)


with BuildPart() as cut_extrude7_tool:
    # Sketch10 → Cut-Extrude7 (new body)
    with BuildSketch(Plane.XY.offset(-3.1)):
        with Locations(Location((-19.8875, 1.989909678, 0), (0, 0, 180))):
            Circle(SKETCH10_R)
    extrude(amount=CUT_EXTRUDE7_DEPTH)


with BuildPart() as cut_extrude3_piece_2_2:
    add(cut_extrude3_piece_2_1.part)

    # Cut-Extrude7: cut by cut_extrude7_tool
    add(cut_extrude7_tool.part, mode=Mode.SUBTRACT)

    # Fillet4
    fillet4_edges = [cut_extrude3_piece_2_2.edges().sort_by_distance(p)[0] for p in [
        (17.1125, 10, 0.5),
    ]]
    fillet(fillet4_edges, radius=FILLET4_R)


with BuildPart() as body_3_2:
    add(body_3_1.part)

    # Cut-Extrude7: cut by cut_extrude7_tool
    add(cut_extrude7_tool.part, mode=Mode.SUBTRACT)

    # Fillet5
    fillet5_edges = [body_3_2.edges().sort_by_distance(p)[0] for p in [
        (17.1125, 10, 5),
    ]]
    fillet(fillet5_edges, radius=FILLET5_R)

    # Sketch18 → Cut-Extrude11 (cut)
    with BuildSketch(Plane.XY.offset(8)):
        with Locations((-14.036807943, -13.847364557)):
            Circle(SKETCH18_R)
        with Locations((-26.401442701, -26.840709556)):
            Circle(SKETCH18_R)
    extrude(amount=-CUT_EXTRUDE11_DEPTH, mode=Mode.SUBTRACT)


solid = Compound([cut_extrude3_piece_1_1.part, cut_extrude3_piece_2_2.part, body_3_2.part])
